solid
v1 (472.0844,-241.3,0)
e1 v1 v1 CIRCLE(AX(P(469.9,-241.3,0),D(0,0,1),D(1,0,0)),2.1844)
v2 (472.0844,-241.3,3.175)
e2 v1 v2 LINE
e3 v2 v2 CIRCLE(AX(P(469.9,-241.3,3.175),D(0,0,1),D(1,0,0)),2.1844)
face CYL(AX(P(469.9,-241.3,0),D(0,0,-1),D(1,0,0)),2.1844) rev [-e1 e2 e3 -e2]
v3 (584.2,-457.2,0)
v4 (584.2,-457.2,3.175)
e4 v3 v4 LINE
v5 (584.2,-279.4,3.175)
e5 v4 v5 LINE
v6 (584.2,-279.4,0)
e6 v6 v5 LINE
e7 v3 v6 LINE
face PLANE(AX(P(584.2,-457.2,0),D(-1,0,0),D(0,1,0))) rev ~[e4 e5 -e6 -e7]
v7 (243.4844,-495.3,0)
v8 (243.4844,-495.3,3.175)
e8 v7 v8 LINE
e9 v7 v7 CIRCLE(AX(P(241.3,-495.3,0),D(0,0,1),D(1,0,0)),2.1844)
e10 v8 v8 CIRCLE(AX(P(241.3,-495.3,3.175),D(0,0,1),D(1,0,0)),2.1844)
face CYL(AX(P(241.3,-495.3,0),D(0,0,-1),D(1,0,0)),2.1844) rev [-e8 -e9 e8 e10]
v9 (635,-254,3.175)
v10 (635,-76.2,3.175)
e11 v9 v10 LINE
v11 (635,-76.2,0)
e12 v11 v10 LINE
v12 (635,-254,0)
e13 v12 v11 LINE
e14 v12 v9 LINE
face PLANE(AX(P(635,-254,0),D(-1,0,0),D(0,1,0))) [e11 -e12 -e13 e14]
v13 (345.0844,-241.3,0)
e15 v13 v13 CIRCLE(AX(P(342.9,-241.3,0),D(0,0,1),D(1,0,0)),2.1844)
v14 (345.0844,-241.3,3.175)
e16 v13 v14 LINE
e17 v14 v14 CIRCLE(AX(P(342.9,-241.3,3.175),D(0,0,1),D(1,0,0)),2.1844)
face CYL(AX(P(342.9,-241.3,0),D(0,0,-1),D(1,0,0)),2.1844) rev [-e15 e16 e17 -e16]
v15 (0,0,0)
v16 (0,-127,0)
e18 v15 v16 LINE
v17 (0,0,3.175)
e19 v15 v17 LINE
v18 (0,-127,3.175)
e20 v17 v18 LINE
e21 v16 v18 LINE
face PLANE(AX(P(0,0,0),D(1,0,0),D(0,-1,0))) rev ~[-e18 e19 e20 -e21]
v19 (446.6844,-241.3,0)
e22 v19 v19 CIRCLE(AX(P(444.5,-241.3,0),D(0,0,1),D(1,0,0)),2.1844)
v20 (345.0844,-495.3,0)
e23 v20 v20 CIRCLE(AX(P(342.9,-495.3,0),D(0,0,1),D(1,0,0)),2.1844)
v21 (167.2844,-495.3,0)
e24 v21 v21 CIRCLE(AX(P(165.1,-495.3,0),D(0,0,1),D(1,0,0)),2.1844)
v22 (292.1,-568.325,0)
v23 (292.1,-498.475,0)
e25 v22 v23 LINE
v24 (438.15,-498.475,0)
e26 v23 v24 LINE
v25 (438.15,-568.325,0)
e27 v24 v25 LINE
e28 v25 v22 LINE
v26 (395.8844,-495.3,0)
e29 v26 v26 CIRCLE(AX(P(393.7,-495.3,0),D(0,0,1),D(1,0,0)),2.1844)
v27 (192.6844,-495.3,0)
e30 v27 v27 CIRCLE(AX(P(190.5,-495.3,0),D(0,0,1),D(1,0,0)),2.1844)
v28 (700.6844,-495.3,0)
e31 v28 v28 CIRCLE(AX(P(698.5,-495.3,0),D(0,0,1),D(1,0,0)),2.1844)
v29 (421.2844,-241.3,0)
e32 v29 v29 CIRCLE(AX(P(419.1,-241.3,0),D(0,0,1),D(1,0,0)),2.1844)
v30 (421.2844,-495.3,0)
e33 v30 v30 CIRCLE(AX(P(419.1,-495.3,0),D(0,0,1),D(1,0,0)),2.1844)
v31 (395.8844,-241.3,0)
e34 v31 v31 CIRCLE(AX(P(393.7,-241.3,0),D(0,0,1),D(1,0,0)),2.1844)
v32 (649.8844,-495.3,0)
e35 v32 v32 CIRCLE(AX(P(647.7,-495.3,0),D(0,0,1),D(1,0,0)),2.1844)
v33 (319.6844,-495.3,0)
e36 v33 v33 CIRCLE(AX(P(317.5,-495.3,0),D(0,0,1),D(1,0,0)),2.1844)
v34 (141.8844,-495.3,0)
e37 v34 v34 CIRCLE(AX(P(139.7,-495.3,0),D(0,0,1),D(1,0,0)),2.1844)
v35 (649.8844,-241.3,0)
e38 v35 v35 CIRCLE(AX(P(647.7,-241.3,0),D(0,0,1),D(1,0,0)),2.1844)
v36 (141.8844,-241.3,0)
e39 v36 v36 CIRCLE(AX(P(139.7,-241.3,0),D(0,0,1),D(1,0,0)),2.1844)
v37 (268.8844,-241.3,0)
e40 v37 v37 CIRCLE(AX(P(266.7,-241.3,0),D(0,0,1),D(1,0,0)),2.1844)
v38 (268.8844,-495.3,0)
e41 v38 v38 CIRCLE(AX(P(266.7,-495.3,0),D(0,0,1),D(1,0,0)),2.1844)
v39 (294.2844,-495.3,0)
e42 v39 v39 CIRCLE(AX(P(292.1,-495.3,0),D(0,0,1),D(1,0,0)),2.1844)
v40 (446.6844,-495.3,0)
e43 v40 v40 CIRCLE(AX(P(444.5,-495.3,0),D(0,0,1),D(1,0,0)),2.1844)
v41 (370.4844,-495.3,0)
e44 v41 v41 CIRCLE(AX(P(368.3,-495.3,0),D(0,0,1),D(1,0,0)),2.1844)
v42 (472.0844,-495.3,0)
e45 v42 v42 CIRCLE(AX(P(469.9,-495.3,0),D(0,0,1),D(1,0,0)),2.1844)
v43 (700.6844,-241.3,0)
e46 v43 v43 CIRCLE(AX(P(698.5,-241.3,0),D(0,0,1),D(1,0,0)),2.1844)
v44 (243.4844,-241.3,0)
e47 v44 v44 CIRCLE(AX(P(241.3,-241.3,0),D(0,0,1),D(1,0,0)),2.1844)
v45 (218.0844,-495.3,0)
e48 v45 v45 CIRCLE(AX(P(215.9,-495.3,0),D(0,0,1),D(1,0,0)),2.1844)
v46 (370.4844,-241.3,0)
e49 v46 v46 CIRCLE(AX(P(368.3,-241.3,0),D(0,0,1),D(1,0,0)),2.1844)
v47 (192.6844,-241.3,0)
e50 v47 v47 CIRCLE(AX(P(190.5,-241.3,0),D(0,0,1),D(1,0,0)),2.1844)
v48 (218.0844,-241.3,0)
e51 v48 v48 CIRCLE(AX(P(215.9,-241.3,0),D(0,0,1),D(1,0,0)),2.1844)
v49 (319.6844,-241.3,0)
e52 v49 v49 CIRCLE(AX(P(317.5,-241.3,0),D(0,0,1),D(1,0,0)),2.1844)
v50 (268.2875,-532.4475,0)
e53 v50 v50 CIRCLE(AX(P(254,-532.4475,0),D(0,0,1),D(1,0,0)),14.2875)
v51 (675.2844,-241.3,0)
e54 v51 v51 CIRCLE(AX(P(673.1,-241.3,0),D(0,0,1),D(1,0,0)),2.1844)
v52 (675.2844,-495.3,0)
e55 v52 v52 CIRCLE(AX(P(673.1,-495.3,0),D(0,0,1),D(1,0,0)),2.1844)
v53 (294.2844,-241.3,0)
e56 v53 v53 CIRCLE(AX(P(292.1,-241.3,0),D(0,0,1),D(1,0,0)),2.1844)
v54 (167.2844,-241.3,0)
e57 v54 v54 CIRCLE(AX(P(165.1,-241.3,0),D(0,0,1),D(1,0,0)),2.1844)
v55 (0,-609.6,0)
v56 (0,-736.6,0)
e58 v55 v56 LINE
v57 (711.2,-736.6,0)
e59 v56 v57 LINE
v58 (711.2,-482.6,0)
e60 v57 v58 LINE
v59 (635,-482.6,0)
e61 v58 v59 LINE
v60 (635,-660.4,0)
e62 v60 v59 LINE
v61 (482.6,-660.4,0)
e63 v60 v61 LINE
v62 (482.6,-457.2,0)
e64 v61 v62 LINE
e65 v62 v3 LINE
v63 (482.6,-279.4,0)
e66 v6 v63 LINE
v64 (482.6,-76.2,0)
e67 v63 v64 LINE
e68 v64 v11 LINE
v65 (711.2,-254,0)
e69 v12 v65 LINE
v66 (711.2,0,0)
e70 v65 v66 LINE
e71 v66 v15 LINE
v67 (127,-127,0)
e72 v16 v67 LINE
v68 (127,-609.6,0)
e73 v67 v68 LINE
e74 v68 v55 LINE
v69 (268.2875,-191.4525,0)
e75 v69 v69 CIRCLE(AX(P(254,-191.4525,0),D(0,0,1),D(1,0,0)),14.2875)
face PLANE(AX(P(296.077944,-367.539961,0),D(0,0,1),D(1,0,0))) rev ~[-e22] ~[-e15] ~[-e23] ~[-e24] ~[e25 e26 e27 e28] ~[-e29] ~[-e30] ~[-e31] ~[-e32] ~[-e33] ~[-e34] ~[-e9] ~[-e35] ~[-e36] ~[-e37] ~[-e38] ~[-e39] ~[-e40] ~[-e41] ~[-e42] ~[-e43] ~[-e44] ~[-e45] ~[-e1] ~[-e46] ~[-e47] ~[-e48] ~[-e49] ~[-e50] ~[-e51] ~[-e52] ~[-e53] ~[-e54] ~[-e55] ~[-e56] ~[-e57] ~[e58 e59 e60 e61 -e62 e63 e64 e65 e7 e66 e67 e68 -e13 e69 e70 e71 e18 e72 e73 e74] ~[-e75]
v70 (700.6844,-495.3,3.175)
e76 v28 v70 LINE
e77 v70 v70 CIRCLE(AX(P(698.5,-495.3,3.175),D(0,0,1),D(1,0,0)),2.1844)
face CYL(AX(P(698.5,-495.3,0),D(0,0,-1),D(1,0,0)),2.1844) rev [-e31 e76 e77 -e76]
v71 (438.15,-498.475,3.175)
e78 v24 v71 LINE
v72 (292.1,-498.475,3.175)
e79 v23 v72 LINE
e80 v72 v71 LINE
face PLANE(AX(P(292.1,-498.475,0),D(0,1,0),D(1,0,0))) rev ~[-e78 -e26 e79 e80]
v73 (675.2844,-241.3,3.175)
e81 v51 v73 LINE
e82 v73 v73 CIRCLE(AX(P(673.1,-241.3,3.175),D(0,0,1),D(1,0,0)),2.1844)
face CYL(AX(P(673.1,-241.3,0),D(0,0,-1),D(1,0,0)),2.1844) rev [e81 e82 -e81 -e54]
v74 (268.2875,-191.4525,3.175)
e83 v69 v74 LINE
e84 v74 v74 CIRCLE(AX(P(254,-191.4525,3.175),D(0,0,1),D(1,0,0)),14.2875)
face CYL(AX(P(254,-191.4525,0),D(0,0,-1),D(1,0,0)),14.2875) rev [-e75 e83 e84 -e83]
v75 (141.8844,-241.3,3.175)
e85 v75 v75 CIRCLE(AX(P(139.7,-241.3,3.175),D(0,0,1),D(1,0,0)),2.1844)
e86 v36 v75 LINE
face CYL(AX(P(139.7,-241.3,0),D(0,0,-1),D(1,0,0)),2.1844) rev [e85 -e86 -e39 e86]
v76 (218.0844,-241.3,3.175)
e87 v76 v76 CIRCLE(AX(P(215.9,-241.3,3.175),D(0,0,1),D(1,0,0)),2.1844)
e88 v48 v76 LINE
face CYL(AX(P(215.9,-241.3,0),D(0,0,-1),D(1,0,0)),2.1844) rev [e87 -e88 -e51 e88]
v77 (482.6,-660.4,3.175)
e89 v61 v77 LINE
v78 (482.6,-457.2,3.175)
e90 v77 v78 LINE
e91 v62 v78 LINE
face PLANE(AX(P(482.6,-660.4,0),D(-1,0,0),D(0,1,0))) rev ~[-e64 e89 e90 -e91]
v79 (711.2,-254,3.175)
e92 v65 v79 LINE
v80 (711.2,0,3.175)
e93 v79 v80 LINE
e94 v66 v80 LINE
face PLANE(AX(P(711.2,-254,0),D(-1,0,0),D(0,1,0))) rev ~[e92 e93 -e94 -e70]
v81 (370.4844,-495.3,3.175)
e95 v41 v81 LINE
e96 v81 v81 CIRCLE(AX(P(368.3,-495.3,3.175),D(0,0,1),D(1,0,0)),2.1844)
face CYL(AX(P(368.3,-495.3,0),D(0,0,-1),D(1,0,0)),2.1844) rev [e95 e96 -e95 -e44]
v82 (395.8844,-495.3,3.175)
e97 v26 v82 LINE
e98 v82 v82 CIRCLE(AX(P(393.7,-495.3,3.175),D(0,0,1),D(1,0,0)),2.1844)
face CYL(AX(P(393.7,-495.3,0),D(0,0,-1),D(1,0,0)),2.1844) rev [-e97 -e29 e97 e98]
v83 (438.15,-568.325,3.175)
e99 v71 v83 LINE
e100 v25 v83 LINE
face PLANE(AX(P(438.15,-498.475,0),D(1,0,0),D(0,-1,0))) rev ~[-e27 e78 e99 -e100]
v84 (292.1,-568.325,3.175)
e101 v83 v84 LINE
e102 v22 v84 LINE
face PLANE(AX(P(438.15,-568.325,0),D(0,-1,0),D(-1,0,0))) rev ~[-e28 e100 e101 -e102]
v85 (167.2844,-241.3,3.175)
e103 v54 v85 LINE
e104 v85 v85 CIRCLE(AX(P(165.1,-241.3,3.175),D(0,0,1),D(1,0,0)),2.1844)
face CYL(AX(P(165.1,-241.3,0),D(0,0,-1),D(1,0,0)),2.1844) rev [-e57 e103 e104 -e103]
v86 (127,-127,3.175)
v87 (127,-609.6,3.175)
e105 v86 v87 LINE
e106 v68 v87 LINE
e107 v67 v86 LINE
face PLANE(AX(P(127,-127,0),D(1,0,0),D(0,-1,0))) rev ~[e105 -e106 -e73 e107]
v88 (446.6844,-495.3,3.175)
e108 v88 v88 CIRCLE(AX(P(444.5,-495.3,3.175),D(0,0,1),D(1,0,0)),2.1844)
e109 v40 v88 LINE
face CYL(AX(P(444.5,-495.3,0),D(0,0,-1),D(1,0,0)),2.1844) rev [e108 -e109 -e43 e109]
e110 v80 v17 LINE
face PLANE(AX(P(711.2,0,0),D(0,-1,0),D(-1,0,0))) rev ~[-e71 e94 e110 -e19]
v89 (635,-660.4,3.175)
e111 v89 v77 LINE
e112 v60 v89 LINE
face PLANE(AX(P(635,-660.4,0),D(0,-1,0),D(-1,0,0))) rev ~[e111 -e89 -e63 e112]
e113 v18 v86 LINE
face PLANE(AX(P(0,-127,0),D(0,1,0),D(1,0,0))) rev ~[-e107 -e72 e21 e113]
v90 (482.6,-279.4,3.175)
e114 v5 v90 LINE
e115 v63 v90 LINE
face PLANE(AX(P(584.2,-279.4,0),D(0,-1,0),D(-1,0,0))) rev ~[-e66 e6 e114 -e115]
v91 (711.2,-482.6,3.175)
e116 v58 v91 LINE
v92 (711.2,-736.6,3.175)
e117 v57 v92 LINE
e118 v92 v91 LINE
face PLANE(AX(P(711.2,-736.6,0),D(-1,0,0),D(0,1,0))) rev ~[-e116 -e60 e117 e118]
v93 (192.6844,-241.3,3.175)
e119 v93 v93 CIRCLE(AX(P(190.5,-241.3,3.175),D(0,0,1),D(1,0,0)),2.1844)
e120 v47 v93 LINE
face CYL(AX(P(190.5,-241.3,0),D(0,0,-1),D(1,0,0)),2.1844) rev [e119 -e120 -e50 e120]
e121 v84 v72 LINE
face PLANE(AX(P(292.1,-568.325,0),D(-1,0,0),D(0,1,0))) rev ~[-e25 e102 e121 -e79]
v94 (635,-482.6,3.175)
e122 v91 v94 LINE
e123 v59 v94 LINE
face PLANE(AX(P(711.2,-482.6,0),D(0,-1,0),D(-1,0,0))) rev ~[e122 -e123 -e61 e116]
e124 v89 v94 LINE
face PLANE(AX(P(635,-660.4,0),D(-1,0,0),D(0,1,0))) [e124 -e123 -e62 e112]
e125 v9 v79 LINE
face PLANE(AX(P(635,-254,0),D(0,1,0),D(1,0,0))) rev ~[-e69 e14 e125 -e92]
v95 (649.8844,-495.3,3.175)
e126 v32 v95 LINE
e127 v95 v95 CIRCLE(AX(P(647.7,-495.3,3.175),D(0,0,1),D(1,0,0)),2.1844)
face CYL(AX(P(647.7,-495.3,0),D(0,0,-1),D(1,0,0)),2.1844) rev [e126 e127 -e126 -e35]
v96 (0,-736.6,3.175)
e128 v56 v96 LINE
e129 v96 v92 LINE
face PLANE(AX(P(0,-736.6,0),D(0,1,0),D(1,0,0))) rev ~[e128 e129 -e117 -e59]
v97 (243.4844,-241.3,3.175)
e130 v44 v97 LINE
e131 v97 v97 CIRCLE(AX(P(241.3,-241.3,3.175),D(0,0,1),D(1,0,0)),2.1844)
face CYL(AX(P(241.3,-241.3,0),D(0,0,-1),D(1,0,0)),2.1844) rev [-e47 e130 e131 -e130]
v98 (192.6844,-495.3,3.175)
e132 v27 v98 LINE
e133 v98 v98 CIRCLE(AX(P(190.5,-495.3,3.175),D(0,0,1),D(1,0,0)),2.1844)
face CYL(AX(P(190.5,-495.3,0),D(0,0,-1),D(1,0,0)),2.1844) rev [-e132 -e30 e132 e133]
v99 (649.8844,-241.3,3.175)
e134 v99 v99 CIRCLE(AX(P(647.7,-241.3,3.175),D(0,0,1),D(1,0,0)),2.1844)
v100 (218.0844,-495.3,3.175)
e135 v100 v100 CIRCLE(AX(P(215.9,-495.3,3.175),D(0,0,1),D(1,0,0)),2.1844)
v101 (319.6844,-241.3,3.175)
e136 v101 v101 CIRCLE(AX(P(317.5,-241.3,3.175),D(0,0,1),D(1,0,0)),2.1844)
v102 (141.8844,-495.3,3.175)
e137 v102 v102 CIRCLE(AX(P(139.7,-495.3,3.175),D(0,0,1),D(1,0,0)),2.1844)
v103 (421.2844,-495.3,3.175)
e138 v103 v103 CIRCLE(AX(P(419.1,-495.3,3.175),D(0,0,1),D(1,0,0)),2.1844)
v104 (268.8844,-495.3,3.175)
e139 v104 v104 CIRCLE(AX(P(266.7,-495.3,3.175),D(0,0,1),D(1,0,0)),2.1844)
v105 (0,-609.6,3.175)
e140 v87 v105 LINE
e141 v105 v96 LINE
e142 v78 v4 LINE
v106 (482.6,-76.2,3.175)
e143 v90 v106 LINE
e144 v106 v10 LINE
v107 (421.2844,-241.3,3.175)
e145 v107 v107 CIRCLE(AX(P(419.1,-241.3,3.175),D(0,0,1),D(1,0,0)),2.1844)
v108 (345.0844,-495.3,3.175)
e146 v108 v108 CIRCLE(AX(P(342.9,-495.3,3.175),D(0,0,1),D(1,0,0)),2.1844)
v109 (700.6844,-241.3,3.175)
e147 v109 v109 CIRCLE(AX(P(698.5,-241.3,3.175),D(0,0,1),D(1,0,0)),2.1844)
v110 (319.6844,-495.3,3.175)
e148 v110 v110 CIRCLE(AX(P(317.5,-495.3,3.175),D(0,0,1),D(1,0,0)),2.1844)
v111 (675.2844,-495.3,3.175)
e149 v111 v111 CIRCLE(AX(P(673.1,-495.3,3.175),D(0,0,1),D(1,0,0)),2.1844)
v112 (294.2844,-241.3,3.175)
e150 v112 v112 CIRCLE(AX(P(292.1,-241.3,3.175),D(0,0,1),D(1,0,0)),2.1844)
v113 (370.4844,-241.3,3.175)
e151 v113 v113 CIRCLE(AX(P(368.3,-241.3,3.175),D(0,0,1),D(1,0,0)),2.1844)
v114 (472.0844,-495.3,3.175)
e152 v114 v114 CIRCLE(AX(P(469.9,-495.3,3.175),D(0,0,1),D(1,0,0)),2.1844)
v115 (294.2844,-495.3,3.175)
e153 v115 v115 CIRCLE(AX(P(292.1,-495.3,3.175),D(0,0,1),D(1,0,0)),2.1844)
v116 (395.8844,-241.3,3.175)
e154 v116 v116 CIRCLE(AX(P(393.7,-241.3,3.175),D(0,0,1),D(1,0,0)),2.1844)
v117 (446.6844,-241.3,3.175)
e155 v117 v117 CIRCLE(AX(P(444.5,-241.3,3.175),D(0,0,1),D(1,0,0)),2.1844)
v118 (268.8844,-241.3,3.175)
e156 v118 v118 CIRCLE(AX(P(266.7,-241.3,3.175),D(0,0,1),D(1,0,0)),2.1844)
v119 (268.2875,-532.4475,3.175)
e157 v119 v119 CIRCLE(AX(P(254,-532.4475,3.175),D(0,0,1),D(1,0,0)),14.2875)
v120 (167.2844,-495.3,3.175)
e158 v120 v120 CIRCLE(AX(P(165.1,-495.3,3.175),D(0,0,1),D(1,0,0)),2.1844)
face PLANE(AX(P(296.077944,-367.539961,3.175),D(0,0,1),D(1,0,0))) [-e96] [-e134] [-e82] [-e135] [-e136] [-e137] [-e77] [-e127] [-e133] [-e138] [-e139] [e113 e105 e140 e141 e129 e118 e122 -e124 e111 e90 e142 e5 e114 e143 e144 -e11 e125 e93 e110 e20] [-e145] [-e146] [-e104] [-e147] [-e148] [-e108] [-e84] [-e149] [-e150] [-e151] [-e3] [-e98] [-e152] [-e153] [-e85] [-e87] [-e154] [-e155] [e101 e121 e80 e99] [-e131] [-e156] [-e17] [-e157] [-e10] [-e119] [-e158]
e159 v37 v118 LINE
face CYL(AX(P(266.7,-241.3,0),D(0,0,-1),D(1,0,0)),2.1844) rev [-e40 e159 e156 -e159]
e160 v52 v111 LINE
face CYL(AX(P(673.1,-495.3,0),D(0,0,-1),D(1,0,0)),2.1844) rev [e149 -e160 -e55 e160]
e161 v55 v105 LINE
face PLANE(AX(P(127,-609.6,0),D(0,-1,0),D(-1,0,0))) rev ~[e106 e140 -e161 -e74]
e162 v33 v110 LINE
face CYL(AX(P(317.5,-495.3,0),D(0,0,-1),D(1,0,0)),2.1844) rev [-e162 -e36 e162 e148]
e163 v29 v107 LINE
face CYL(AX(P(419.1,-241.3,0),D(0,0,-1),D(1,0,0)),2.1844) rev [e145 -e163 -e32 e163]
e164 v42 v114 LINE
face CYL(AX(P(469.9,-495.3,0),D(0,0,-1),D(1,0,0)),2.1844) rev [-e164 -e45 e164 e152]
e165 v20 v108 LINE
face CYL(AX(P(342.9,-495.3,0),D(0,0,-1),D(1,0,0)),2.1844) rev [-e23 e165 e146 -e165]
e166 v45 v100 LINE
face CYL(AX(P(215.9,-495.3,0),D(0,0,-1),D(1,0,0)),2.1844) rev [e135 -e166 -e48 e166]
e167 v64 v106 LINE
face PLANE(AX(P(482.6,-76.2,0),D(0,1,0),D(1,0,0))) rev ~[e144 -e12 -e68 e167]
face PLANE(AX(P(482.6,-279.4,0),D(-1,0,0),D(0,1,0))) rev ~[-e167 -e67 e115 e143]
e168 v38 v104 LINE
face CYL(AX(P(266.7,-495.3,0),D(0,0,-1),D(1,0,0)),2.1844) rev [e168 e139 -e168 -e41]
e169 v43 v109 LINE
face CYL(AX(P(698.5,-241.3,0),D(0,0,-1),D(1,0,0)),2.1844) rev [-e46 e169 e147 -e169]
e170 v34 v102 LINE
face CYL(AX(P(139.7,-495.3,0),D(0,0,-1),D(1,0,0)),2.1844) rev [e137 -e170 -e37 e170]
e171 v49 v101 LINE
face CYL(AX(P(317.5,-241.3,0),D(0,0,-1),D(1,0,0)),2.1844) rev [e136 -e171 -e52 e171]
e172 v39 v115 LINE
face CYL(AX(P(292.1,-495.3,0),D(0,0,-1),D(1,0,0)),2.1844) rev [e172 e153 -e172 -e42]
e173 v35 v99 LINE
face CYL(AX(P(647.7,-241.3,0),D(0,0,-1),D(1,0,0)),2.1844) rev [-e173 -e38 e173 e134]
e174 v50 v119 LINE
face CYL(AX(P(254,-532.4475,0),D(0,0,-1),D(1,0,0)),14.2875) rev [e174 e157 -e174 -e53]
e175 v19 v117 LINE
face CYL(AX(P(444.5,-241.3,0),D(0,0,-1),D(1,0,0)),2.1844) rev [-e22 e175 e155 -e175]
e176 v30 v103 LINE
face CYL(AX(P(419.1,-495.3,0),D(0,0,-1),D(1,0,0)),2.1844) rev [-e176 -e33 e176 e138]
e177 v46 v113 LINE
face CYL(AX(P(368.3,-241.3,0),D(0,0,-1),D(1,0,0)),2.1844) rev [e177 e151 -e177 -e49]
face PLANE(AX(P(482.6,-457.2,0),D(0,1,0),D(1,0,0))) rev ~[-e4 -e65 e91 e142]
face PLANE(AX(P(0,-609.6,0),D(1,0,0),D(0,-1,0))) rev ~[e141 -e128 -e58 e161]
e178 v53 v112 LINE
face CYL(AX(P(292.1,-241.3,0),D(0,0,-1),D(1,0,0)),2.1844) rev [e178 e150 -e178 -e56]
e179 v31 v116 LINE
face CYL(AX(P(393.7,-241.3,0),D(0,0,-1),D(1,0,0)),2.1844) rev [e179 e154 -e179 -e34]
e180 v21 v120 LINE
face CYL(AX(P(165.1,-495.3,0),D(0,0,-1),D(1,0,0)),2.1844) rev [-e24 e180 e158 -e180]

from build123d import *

# Parameters (mm, degrees)
F0_R     = 2.1844
F0_R_2   = 14.2875
F0_W     = 50.8
F0_H     = 177.8
F0_W_2   = 196.85
F0_H_2   = 9.525
F1_DEPTH = 3.175


# Not quite as in the source:
# - a feature names something its author has since deleted; it is built from what else it names


with BuildPart() as f1:
    # F0 (on Top) → F1 (new body)
    with BuildSketch(Plane.XY):
        Polygon((431.8, 0), (0, 0), (0, -127), (127, -127), (127, -609.6), (0, -609.6), (0, -736.6), (431.8, -736.6), (431.8, -660.4), (482.6, -660.4), (482.6, -457.2), (584.2, -457.2), (584.2, -366.7125), (387.35, -366.7125), (387.35, -357.1875), (584.2, -357.1875), (584.2, -279.4), (482.6, -279.4), (482.6, -76.2), (431.8, -76.2), align=None)
        with Locations((139.7, -495.3)):
            Circle(F0_R, mode=Mode.SUBTRACT)
        with Locations((165.1, -495.3)):
            Circle(F0_R, mode=Mode.SUBTRACT)
        with Locations((254, -532.4475)):
            Circle(F0_R_2, mode=Mode.SUBTRACT)
        with Locations((190.5, -495.3)):
            Circle(F0_R, mode=Mode.SUBTRACT)
        with Locations((215.9, -495.3)):
            Circle(F0_R, mode=Mode.SUBTRACT)
        with Locations((241.3, -495.3)):
            Circle(F0_R, mode=Mode.SUBTRACT)
        with Locations((266.7, -495.3)):
            Circle(F0_R, mode=Mode.SUBTRACT)
        with Locations((292.1, -495.3)):
            Circle(F0_R, mode=Mode.SUBTRACT)
        with Locations((317.5, -495.3)):
            Circle(F0_R, mode=Mode.SUBTRACT)
        with Locations((342.9, -495.3)):
            Circle(F0_R, mode=Mode.SUBTRACT)
        Polygon((387.35, -498.475), (438.15, -498.475), (438.15, -568.325), (292.1, -568.325), (292.1, -498.475), align=None, mode=Mode.SUBTRACT)
        with Locations((368.3, -495.3)):
            Circle(F0_R, mode=Mode.SUBTRACT)
        with Locations((393.7, -495.3)):
            Circle(F0_R, mode=Mode.SUBTRACT)
        with Locations((419.1, -495.3)):
            Circle(F0_R, mode=Mode.SUBTRACT)
        with Locations((444.5, -495.3)):
            Circle(F0_R, mode=Mode.SUBTRACT)
        with Locations((469.9, -495.3)):
            Circle(F0_R, mode=Mode.SUBTRACT)
        with Locations((139.7, -241.3)):
            Circle(F0_R, mode=Mode.SUBTRACT)
        with Locations((165.1, -241.3)):
            Circle(F0_R, mode=Mode.SUBTRACT)
        with Locations((190.5, -241.3)):
            Circle(F0_R, mode=Mode.SUBTRACT)
        with Locations((215.9, -241.3)):
            Circle(F0_R, mode=Mode.SUBTRACT)
        with Locations((241.3, -241.3)):
            Circle(F0_R, mode=Mode.SUBTRACT)
        with Locations((266.7, -241.3)):
            Circle(F0_R, mode=Mode.SUBTRACT)
        with Locations((254, -191.4525)):
            Circle(F0_R_2, mode=Mode.SUBTRACT)
        with Locations((292.1, -241.3)):
            Circle(F0_R, mode=Mode.SUBTRACT)
        with Locations((317.5, -241.3)):
            Circle(F0_R, mode=Mode.SUBTRACT)
        with Locations((342.9, -241.3)):
            Circle(F0_R, mode=Mode.SUBTRACT)
        with Locations((368.3, -241.3)):
            Circle(F0_R, mode=Mode.SUBTRACT)
        with Locations((393.7, -241.3)):
            Circle(F0_R, mode=Mode.SUBTRACT)
        with Locations((419.1, -241.3)):
            Circle(F0_R, mode=Mode.SUBTRACT)
        with Locations((444.5, -241.3)):
            Circle(F0_R, mode=Mode.SUBTRACT)
        with Locations((469.9, -241.3)):
            Circle(F0_R, mode=Mode.SUBTRACT)
        Polygon((685.8, 0), (431.8, 0), (431.8, -76.2), (482.6, -76.2), (635, -76.2), (685.8, -76.2), align=None)
        Polygon((711.2, 0), (685.8, 0), (685.8, -76.2), (685.8, -254), (711.2, -254), align=None)
        with Locations((698.5, -241.3)):
            Circle(F0_R, mode=Mode.SUBTRACT)
        with Locations((660.4, -165.1)):
            Rectangle(F0_W, F0_H)
        with Locations((647.7, -241.3)):
            Circle(F0_R, mode=Mode.SUBTRACT)
        with Locations((673.1, -241.3)):
            Circle(F0_R, mode=Mode.SUBTRACT)
        Polygon((431.8, -660.4), (431.8, -736.6), (685.8, -736.6), (685.8, -660.4), (635, -660.4), (482.6, -660.4), align=None)
        Polygon((711.2, -736.6), (711.2, -482.6), (685.8, -482.6), (685.8, -660.4), (685.8, -736.6), align=None)
        with Locations((698.5, -495.3)):
            Circle(F0_R, mode=Mode.SUBTRACT)
        with Locations((660.4, -571.5)):
            Rectangle(F0_W, F0_H)
        with Locations((647.7, -495.3)):
            Circle(F0_R, mode=Mode.SUBTRACT)
        with Locations((673.1, -495.3)):
            Circle(F0_R, mode=Mode.SUBTRACT)
        with Locations((485.775, -361.95)):
            Rectangle(F0_W_2, F0_H_2)
    extrude(amount=F1_DEPTH)


solid = f1.part
